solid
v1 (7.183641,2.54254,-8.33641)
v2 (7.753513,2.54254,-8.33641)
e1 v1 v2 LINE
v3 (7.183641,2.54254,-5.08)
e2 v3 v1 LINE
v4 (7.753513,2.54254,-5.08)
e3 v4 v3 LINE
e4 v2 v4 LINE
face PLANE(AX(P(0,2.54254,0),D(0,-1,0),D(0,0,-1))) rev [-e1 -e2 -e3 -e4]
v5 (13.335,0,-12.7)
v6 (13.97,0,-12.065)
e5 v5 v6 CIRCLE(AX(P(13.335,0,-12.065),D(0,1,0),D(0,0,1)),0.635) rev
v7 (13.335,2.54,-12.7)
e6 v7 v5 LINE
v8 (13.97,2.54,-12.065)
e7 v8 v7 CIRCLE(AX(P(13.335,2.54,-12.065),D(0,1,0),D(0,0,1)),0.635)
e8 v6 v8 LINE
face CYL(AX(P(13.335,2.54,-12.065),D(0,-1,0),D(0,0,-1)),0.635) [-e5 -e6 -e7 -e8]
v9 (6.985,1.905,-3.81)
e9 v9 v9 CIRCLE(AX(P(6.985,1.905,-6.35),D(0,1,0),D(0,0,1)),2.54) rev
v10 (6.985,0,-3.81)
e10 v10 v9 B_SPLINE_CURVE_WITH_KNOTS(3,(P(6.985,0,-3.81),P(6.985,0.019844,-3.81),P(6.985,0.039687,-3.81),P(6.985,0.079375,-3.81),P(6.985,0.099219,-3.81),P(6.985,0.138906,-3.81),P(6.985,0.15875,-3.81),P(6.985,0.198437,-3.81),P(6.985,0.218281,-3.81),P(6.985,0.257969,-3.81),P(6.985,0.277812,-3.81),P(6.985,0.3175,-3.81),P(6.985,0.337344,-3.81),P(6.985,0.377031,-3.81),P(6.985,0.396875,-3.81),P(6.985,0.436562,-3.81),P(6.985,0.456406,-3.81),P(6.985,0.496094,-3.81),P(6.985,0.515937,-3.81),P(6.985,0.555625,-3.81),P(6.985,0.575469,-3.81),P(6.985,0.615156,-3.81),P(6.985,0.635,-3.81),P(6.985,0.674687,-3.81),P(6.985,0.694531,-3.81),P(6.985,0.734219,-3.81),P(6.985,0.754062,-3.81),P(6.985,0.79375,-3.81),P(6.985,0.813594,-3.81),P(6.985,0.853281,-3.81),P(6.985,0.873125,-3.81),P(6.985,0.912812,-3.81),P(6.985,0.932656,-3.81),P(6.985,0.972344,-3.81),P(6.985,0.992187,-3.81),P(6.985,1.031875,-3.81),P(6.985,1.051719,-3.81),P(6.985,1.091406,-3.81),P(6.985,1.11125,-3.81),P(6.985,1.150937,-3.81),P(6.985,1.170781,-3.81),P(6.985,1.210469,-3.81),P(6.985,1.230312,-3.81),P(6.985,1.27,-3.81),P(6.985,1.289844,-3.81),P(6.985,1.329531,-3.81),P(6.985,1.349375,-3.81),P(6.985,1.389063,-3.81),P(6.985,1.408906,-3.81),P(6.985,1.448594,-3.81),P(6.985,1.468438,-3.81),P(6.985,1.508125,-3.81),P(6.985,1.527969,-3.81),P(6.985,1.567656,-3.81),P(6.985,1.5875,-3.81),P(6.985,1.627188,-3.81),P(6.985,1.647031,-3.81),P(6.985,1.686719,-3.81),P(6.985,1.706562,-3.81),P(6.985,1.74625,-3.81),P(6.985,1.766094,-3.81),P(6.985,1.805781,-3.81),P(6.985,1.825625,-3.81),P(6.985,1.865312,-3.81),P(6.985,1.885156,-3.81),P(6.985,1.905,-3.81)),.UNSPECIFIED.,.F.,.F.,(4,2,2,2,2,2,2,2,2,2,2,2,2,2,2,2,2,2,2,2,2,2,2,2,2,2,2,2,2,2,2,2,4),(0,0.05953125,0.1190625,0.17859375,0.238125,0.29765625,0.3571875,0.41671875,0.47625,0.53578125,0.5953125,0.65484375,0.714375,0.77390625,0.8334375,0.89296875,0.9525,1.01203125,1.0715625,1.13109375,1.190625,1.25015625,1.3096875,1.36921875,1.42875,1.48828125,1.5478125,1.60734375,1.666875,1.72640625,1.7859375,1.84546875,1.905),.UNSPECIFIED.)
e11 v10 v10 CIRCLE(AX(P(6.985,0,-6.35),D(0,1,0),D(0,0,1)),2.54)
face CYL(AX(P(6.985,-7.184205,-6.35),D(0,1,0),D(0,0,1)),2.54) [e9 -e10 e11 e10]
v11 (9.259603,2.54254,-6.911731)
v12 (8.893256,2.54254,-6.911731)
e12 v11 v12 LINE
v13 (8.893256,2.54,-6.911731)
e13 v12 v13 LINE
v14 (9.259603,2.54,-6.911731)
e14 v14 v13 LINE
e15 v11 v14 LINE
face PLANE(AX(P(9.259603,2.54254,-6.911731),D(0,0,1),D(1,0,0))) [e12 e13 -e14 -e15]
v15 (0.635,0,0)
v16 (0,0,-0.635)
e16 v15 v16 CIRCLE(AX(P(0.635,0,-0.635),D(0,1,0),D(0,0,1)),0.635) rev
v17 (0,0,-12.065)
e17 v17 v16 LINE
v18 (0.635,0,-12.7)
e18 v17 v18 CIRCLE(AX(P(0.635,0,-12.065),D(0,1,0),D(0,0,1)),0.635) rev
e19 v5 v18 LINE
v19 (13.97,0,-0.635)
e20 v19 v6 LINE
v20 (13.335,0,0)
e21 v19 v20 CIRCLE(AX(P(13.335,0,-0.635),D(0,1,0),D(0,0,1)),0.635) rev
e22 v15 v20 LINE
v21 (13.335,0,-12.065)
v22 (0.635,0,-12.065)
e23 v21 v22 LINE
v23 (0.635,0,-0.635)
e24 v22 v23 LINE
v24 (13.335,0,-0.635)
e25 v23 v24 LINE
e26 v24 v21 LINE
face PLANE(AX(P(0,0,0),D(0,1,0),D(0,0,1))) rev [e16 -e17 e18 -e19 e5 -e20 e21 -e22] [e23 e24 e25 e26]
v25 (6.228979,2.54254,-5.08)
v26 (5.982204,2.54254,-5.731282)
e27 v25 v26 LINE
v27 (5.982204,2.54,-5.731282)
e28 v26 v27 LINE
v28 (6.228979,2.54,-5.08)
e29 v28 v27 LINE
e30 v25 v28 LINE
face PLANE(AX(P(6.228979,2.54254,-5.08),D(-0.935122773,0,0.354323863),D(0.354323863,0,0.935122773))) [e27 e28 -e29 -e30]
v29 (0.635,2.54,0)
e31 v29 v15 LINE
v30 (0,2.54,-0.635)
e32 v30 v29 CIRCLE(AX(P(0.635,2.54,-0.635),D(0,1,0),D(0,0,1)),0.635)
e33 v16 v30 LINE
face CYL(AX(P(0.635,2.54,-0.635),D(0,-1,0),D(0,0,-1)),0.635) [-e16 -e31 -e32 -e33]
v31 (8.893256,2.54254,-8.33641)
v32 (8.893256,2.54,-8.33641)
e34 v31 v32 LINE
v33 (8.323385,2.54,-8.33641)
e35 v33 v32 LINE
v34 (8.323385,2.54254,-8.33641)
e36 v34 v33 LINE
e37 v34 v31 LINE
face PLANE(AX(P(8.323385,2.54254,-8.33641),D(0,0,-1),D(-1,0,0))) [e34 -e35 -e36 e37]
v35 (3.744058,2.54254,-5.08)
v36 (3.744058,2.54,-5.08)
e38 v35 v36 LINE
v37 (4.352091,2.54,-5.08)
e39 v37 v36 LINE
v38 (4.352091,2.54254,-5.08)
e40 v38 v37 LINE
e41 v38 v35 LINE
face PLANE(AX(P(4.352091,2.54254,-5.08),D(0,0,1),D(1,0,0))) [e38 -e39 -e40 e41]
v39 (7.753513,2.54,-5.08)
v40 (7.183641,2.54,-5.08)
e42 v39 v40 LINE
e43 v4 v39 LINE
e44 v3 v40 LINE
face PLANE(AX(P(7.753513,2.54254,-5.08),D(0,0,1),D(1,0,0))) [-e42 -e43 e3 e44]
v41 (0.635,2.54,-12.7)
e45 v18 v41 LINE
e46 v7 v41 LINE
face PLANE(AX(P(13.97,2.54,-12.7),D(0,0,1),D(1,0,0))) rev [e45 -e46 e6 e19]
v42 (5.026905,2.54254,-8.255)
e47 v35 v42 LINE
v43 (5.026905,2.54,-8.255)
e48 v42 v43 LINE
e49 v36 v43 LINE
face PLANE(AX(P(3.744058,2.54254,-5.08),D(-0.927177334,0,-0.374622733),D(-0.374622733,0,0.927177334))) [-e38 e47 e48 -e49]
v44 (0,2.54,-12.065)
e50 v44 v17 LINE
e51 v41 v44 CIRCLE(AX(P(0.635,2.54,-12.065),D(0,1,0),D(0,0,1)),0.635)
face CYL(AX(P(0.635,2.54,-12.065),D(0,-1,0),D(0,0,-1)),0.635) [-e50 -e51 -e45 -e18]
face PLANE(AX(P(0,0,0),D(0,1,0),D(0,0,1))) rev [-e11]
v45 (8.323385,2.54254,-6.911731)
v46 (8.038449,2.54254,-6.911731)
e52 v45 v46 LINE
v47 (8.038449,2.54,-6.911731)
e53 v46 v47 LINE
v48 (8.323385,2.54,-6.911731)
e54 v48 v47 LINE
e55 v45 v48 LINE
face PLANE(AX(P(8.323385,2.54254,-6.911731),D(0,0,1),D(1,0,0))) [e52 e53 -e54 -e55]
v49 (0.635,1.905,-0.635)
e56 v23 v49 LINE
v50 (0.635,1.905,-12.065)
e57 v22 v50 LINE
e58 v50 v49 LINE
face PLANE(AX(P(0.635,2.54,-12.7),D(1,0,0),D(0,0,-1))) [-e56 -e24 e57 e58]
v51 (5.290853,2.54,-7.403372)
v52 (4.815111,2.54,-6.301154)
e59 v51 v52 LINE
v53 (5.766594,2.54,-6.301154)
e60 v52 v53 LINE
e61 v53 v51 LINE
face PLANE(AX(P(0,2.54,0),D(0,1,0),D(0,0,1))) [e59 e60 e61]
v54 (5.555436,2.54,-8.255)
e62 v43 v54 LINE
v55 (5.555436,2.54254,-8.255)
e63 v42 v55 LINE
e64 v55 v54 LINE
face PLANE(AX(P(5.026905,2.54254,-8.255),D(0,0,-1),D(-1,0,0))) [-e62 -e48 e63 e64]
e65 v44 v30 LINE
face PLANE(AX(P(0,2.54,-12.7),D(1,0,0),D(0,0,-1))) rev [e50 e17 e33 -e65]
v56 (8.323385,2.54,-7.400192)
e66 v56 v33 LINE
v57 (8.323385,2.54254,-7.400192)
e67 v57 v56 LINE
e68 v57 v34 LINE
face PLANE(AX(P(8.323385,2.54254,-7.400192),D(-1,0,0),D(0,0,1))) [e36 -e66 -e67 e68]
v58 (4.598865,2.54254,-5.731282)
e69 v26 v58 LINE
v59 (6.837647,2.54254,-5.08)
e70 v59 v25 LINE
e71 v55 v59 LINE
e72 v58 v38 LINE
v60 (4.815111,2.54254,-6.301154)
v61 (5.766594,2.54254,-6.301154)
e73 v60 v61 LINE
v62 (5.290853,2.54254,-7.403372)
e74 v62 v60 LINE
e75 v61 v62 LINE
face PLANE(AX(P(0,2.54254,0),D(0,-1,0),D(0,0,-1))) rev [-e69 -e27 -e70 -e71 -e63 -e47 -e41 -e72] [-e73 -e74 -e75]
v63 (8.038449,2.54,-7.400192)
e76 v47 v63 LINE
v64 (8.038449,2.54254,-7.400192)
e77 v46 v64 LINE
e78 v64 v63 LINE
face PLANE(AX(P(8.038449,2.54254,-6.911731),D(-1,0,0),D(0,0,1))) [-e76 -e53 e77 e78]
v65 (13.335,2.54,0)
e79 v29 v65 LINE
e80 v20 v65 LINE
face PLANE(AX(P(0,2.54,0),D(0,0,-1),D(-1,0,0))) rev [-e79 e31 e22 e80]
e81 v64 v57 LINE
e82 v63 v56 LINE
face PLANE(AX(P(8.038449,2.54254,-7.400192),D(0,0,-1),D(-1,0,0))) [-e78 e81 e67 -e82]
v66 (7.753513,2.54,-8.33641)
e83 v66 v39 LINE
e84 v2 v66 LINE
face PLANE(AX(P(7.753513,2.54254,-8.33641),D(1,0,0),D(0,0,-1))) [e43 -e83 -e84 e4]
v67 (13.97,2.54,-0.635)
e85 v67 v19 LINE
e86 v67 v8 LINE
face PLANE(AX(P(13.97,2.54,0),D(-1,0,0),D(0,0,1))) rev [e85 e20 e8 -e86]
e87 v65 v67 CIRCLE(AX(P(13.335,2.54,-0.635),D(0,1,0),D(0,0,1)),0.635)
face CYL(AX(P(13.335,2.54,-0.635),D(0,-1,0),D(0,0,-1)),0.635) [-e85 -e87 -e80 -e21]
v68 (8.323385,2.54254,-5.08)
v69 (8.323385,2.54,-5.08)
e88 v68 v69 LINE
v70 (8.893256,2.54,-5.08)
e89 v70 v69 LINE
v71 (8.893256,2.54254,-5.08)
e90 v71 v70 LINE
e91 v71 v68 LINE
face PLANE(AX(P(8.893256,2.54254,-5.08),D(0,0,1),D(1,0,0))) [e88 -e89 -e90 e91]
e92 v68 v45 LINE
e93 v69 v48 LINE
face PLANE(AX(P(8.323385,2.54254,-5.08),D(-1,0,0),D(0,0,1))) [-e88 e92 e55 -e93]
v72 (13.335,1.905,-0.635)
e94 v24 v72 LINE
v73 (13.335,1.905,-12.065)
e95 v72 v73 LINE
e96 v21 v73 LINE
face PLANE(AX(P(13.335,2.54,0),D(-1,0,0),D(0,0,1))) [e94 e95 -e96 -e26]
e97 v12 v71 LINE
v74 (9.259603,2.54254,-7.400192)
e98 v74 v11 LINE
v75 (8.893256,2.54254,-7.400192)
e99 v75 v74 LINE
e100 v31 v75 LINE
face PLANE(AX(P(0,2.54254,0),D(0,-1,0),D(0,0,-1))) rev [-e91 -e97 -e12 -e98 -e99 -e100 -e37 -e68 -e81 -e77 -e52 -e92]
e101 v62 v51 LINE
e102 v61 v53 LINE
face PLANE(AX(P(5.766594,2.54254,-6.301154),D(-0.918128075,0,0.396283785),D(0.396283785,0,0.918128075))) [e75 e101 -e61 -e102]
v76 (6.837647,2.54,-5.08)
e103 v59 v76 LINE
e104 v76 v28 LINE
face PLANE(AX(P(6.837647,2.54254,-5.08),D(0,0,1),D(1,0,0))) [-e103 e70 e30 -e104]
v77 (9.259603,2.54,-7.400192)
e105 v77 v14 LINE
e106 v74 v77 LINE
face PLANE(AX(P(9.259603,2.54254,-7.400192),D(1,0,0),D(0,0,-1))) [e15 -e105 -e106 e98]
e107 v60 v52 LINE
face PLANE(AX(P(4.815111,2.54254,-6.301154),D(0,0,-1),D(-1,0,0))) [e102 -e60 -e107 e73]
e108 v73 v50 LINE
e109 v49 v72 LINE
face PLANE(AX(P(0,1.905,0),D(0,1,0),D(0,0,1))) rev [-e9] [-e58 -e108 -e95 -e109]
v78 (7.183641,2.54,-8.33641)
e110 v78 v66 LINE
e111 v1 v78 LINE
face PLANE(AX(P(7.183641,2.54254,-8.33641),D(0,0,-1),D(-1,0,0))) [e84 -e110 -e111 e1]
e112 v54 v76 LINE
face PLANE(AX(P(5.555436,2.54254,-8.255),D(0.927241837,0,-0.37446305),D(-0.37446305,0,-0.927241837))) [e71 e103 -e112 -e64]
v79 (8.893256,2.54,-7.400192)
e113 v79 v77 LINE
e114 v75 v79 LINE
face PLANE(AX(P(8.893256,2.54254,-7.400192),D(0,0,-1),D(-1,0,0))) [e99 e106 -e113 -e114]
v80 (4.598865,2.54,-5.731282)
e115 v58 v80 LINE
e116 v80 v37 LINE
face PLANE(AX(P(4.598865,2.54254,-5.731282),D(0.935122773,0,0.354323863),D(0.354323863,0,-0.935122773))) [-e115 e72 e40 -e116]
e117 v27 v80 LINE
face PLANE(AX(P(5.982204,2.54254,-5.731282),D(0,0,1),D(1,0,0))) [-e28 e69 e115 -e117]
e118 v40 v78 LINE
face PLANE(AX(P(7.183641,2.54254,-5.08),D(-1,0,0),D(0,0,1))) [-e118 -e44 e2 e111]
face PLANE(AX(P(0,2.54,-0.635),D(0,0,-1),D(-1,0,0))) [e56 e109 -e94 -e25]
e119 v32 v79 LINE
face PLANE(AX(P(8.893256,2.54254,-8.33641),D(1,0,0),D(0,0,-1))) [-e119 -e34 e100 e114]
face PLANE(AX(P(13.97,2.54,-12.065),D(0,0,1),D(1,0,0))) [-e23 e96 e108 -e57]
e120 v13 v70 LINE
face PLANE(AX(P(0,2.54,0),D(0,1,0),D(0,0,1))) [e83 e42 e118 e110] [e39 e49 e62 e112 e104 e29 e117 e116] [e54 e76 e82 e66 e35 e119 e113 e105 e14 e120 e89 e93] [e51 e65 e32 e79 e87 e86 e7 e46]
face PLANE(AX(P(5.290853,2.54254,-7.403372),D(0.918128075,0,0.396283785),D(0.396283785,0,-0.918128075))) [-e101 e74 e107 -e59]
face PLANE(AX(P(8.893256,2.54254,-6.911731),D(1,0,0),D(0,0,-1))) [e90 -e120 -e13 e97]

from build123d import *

# Parameters (mm, degrees)
SKETCH1_W           = 13.97
SKETCH1_H           = 12.7
BOSS_EXTRUDE1_DEPTH = 2.54
FILLET1_R           = 0.635
SHELL1_START        = 0.635
SHELL1_OUTLINE_W    = 1.905
SHELL1_OUTLINE_H    = 11.43
SHELL1_DEPTH        = 12.7
SKETCH2_R           = 2.54
BOSS_EXTRUDE2_DEPTH = 1.905
SKETCH3_W           = 0.569871795
SKETCH3_H           = 3.256410256
BOSS_EXTRUDE3_DEPTH = 0.00254


# Read off the part's stored shape, not the designer's step: Shell1
with BuildPart() as part:
    # Sketch1 → Boss-Extrude1 (new body)
    with BuildSketch(Plane(origin=(0, 0, 0), x_dir=(1, 0, 0), z_dir=(0, 1, 0))):
        with Locations((6.985, 6.35)):
            Rectangle(SKETCH1_W, SKETCH1_H)
    extrude(amount=BOSS_EXTRUDE1_DEPTH)

    # Fillet1
    fillet1_edges = [part.edges().sort_by_distance(p)[0] for p in [
        (0, 1.27, -12.7),
        (13.97, 1.27, -12.7),
        (13.97, 1.27, 0),
        (0, 1.27, 0),
    ]]
    fillet(fillet1_edges, radius=FILLET1_R)

    # Shell1 outline → Shell1 (cut)
    with BuildSketch(Plane.YZ.offset(SHELL1_START)):
        with Locations((0.9525, -6.35)):
            Rectangle(SHELL1_OUTLINE_W, SHELL1_OUTLINE_H)
    extrude(amount=SHELL1_DEPTH, mode=Mode.SUBTRACT)

    # Sketch2 → Boss-Extrude2 (add)
    with BuildSketch(Plane(origin=(0, 1.905, 0), x_dir=(-1, 0, 0), z_dir=(0, -1, 0))):
        with Locations(Location((-6.985, 6.35, 0), (0, 0, 270))):
            Circle(SKETCH2_R)
    extrude(amount=BOSS_EXTRUDE2_DEPTH)

    # Sketch3 → Boss-Extrude3 (add)
    # profile 1 of 3: a face of its own
    with BuildSketch(Plane(origin=(0, 2.54, 0), x_dir=(1, 0, 0), z_dir=(0, 1, 0))):
        Polygon((5.026905248, 8.255), (5.555435897, 8.255), (6.837647436, 5.08), (6.228978566, 5.08), (5.982203726, 5.731282051), (4.598865385, 5.731282051), (4.352090545, 5.08), (3.744057692, 5.08), align=None)
        Polygon((5.290852564, 7.403372396), (4.815111378, 6.301153846), (5.76659375, 6.301153846), align=None, mode=Mode.SUBTRACT)
    # profile 2 of 3: a face of its own
    with BuildSketch(Plane(origin=(0, 2.54, 0), x_dir=(1, 0, 0), z_dir=(0, 1, 0))):
        with Locations((7.468576924, 6.708205128)):
            Rectangle(SKETCH3_W, SKETCH3_H)
    # profile 3 of 3: a face of its own
    with BuildSketch(Plane(origin=(0, 2.54, 0), x_dir=(1, 0, 0), z_dir=(0, 1, 0))):
        Polygon((8.323384615, 8.336410256), (8.89325641, 8.336410256), (8.89325641, 7.400192308), (9.259602564, 7.400192308), (9.259602564, 6.911730769), (8.89325641, 6.911730769), (8.89325641, 5.08), (8.323384615, 5.08), (8.323384615, 6.911730769), (8.038448718, 6.911730769), (8.038448718, 7.400192308), (8.323384615, 7.400192308), align=None)
    extrude(amount=BOSS_EXTRUDE3_DEPTH)


solid = part.part
